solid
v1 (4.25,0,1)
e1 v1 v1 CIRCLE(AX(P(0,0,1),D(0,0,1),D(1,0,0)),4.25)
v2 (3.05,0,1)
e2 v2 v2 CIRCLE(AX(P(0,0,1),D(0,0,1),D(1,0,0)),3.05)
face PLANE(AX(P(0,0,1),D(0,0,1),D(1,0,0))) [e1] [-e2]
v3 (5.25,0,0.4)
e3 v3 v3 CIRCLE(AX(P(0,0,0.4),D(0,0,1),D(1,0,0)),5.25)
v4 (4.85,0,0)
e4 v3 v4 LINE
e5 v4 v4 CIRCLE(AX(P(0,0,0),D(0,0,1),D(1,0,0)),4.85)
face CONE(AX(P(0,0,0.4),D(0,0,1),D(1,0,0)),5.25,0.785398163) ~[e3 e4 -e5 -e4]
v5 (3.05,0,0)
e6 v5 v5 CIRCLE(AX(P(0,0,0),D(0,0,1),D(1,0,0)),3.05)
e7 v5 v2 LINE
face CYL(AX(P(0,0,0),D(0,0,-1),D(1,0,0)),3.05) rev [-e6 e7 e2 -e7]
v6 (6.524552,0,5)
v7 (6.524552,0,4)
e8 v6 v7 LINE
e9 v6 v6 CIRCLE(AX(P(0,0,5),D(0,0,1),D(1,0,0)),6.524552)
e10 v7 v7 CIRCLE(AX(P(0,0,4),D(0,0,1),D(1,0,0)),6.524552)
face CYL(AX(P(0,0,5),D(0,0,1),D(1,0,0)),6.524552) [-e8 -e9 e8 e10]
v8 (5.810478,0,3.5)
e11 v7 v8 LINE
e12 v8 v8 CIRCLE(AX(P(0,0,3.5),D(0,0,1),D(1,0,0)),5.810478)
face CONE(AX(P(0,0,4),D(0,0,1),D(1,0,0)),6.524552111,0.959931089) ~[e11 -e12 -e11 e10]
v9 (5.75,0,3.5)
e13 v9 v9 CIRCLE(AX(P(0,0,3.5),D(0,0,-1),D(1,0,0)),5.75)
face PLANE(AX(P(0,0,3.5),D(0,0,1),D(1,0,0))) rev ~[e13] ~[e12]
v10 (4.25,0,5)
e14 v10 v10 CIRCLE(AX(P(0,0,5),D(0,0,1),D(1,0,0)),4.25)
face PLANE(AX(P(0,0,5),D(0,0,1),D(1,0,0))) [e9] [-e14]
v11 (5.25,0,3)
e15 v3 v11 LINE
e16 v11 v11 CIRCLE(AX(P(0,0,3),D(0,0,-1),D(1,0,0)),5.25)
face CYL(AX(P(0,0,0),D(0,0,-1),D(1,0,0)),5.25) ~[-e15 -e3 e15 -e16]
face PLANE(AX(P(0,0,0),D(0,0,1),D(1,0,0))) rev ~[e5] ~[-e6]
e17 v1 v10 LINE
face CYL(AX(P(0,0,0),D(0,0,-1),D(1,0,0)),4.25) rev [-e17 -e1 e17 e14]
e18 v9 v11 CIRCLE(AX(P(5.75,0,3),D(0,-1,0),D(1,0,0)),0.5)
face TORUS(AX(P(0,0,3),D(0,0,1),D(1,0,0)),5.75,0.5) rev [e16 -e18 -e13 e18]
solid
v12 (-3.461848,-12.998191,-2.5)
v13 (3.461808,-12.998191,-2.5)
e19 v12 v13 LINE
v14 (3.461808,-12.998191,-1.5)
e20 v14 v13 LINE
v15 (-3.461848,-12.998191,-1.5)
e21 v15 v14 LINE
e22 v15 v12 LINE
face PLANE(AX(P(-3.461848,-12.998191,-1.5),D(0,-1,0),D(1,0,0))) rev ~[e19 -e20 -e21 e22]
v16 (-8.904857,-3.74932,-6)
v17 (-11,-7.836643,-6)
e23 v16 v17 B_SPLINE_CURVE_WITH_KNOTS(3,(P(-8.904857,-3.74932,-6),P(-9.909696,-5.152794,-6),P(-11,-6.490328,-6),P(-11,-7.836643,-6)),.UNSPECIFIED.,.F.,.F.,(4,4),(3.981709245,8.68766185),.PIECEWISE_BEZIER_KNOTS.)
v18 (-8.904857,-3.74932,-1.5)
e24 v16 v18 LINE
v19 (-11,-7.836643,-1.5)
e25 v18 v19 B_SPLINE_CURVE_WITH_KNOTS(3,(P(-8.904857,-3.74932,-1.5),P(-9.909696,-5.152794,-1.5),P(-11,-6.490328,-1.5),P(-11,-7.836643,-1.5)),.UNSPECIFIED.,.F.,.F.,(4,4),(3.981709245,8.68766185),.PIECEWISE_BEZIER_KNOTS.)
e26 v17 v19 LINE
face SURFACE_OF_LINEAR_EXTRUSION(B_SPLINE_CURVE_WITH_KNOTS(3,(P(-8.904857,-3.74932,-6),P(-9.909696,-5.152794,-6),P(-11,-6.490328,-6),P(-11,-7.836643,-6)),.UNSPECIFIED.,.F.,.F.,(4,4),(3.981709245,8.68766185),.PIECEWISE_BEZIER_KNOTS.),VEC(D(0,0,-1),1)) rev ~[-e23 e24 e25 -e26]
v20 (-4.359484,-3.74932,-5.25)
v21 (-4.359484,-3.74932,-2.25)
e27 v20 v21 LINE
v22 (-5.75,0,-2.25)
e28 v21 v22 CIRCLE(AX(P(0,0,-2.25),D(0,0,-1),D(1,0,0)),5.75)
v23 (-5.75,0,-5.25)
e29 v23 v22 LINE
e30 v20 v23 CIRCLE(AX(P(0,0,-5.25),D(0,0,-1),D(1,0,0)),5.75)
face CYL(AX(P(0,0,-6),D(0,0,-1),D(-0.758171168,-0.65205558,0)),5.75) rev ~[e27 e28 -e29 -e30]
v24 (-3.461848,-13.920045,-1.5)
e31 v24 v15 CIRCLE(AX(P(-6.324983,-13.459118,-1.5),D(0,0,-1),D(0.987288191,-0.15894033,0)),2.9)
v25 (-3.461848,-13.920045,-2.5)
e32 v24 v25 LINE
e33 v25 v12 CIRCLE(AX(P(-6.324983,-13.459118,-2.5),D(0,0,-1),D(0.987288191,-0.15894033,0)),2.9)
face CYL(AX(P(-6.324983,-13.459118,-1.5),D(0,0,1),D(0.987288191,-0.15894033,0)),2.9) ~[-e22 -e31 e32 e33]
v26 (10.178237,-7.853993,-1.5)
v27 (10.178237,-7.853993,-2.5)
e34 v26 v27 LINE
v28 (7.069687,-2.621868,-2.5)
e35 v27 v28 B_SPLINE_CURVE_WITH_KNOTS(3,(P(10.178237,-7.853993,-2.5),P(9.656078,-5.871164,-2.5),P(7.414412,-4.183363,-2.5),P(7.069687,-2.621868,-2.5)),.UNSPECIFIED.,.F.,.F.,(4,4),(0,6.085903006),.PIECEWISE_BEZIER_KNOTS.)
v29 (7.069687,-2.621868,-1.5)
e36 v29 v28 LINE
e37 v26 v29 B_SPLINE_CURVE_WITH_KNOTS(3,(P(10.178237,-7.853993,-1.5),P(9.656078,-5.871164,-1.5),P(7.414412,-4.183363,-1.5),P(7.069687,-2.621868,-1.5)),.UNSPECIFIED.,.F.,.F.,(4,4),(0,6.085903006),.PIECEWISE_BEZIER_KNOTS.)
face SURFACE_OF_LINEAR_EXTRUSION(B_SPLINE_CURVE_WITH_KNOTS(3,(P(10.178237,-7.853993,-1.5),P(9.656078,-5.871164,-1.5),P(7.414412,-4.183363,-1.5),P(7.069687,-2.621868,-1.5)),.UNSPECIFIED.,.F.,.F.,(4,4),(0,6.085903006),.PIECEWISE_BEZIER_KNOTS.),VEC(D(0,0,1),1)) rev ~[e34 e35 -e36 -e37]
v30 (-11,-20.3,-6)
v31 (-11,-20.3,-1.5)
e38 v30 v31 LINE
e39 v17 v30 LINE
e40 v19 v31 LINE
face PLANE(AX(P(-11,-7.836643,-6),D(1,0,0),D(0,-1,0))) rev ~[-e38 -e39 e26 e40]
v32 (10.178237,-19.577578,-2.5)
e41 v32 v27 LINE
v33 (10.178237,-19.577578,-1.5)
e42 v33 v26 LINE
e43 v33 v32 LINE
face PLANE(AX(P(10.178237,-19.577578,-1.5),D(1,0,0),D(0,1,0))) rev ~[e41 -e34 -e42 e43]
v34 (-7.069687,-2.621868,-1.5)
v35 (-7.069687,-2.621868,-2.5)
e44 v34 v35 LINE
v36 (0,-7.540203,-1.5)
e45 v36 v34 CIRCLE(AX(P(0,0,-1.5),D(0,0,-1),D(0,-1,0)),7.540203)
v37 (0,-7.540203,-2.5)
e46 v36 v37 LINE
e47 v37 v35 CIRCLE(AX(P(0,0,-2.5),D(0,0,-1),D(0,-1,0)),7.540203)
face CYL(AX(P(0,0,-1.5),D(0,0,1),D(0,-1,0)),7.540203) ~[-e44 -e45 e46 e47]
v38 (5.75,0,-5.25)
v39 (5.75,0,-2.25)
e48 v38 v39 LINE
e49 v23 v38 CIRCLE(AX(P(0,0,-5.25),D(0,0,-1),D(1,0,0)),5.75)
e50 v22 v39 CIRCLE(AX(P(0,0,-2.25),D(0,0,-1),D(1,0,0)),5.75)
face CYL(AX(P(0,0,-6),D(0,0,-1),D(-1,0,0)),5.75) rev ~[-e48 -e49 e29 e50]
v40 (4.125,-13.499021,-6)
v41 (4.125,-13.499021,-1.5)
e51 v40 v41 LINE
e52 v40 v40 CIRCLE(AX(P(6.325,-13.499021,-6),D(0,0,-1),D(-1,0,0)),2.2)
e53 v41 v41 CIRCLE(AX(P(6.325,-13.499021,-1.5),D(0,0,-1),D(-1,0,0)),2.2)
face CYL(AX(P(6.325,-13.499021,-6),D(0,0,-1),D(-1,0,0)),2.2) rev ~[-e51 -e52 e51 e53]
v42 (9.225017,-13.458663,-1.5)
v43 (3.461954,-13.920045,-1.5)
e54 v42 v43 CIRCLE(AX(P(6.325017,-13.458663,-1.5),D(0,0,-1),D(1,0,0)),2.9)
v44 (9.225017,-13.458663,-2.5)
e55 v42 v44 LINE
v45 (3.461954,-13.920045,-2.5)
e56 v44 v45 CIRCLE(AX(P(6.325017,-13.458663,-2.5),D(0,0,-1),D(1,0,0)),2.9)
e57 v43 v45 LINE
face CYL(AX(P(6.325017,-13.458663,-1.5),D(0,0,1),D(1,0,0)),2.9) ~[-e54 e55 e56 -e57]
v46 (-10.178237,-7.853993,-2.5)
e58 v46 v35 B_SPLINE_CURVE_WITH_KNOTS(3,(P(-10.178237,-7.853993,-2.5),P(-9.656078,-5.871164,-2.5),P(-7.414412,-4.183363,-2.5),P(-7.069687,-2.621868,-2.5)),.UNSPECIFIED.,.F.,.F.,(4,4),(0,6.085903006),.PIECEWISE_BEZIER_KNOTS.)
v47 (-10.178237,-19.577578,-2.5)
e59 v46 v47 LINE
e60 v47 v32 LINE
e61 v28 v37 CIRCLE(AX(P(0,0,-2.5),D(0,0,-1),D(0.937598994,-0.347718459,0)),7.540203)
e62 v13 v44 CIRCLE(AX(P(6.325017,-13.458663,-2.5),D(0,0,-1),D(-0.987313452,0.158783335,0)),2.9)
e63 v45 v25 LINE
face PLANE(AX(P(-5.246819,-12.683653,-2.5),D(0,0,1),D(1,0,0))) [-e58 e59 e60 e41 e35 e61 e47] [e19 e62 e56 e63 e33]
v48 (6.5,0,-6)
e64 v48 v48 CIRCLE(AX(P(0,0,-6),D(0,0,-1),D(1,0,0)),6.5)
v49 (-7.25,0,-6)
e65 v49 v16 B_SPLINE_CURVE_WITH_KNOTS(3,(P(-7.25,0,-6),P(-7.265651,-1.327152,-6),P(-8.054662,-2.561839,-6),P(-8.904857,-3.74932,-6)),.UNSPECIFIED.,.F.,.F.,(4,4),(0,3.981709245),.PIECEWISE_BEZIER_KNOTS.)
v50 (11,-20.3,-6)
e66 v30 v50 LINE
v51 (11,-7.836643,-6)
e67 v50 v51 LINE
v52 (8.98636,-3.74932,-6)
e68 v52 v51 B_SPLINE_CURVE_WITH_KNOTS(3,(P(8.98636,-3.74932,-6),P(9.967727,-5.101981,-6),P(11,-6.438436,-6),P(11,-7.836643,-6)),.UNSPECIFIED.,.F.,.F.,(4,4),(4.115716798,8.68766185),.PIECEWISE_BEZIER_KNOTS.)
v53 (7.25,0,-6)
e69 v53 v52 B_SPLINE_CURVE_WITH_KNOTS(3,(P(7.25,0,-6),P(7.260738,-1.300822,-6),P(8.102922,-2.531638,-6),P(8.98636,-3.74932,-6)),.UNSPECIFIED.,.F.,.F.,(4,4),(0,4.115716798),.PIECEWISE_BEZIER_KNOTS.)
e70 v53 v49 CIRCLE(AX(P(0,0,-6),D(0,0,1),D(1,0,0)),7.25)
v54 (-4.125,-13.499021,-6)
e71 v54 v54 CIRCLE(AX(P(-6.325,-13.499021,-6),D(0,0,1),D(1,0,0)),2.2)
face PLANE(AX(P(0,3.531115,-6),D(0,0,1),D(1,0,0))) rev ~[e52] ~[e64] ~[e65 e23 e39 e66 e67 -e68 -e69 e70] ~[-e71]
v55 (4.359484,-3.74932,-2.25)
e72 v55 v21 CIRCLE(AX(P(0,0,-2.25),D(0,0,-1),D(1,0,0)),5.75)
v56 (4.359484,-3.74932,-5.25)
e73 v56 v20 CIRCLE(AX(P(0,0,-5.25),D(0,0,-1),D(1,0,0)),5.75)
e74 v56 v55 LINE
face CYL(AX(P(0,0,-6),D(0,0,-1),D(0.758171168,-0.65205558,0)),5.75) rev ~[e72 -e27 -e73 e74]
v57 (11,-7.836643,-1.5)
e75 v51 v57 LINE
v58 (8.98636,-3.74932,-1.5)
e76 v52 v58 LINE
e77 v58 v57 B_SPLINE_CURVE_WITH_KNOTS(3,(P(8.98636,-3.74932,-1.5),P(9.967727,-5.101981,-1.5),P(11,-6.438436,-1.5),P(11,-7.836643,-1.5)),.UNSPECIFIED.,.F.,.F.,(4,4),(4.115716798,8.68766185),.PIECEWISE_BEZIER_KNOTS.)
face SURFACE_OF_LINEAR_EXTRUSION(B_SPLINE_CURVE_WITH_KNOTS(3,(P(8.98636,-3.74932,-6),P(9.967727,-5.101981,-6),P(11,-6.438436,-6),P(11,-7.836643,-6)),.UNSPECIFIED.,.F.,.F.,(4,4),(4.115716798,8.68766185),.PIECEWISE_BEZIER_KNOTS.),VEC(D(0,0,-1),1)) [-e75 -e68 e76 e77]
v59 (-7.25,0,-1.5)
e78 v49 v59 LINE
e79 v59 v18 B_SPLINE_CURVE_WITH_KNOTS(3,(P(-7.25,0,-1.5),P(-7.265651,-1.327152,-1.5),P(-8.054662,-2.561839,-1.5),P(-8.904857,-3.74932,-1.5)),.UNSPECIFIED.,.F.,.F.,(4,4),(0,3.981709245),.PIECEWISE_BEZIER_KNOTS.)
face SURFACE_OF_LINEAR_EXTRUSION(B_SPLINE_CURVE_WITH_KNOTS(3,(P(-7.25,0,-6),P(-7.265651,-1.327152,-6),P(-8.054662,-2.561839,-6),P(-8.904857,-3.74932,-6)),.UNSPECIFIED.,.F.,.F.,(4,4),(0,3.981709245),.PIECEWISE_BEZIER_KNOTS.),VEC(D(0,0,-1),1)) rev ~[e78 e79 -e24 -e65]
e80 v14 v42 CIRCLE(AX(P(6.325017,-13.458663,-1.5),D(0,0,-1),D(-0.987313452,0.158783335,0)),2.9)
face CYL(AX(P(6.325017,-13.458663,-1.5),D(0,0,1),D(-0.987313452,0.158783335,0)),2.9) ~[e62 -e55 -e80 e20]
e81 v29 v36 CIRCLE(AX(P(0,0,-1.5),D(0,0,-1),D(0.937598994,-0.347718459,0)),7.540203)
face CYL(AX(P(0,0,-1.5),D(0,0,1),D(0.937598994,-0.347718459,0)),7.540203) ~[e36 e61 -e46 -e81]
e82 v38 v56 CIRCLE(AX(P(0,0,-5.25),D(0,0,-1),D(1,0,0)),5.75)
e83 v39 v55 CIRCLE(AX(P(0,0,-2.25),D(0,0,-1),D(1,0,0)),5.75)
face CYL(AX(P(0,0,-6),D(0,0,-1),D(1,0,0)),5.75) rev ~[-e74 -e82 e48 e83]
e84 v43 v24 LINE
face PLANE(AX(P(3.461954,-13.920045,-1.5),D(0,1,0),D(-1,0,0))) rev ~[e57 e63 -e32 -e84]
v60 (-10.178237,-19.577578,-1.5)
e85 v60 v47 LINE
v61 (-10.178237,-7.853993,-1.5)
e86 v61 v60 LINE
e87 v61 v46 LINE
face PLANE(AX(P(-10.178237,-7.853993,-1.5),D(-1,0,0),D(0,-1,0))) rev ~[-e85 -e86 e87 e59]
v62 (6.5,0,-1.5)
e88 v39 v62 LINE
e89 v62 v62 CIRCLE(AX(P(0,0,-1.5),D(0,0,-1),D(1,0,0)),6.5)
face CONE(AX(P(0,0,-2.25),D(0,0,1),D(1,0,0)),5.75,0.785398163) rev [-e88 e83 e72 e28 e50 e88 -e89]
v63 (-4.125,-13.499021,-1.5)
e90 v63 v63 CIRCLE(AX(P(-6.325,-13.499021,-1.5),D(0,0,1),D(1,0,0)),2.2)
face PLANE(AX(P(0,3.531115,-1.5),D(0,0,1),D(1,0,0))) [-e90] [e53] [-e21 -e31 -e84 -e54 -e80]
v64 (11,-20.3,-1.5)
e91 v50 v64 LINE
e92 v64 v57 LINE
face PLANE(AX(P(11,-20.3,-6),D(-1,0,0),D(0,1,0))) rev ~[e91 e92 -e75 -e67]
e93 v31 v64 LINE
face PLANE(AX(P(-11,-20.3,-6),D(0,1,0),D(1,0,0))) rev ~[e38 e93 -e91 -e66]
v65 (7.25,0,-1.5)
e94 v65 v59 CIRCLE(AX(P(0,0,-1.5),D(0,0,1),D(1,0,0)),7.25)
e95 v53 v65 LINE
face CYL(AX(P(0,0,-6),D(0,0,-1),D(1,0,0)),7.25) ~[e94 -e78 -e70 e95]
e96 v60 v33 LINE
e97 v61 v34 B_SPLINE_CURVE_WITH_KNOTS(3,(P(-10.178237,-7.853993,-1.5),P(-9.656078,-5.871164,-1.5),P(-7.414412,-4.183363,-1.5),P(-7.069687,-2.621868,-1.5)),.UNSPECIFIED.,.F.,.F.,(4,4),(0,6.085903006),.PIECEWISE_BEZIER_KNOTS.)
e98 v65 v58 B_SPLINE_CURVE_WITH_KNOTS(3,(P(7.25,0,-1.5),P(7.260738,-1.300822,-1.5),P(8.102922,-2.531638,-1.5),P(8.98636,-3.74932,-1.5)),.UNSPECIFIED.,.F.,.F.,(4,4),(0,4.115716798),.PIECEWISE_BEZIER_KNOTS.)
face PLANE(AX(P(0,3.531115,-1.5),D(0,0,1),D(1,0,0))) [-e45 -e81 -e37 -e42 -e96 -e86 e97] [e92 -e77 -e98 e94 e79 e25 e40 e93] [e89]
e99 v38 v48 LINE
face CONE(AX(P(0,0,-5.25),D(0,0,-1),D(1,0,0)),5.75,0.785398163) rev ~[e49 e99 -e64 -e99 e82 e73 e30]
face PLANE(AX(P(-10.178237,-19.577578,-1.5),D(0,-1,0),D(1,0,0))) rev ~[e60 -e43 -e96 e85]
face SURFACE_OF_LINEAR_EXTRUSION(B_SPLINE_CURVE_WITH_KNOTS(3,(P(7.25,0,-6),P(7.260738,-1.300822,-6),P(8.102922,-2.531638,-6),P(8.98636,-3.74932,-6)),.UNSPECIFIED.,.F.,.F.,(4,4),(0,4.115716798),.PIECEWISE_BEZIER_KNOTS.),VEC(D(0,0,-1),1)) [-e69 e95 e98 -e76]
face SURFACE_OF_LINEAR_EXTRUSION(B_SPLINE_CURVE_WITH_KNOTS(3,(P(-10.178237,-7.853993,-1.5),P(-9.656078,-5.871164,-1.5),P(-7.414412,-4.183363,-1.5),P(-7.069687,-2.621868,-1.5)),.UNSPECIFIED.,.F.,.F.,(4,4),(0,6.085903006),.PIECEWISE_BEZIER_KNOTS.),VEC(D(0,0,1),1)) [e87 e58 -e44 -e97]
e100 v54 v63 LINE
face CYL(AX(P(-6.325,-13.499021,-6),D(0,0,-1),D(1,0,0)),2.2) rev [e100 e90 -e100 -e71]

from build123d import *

# Parameters (mm, degrees)
F0_R      = 4.25
F0_R_2    = 3.05
F1_DEPTH  = 1
F0_R_3    = 5.25
F2_DEPTH  = 5
F3_SIZE   = 0.4
F5_R      = 6.5245521105
F5_R_2    = 4.8436348364
F6_DEPTH  = 1.5
F7_R      = 0.5
F8_SIZE2  = 0.7140740034
F8_SIZE   = 0.5
F10_R     = 2.2
F11_DEPTH = 4.5
F15_DEPTH = 1


# Not quite as in the source:
# - a fillet or chamfer that OpenCascade refuses, or shapes differently, is made with other operations: its cross-section is extruded or revolved along the edge and cut away or added


with BuildPart() as f1:
    # F0 (on Top) → F1 (new body)
    with BuildSketch(Plane.XY):
        Circle(F0_R)
        Circle(F0_R_2, mode=Mode.SUBTRACT)
    extrude(amount=F1_DEPTH)

    # F0 (on Top) → F2 (join)
    with BuildSketch(Plane.XY):
        Circle(F0_R_3)
        Circle(F0_R, mode=Mode.SUBTRACT)
    extrude(amount=F2_DEPTH)

    # F3
    f3_edges = [f1.edges().sort_by_distance(p)[0] for p in [
        (-5.25, 0, 0),
    ]]
    chamfer(f3_edges, length=F3_SIZE)

    # F5 (on offset) → F6 (join)
    with BuildSketch(Plane.XY.offset(5)):
        Circle(F5_R)
        Circle(F5_R_2, mode=Mode.SUBTRACT)
    extrude(amount=-F6_DEPTH)

    # F7
    f7_edges = [f1.edges().sort_by_distance(p)[0] for p in [
        (-5.25, 0, 3.5),
    ]]
    fillet(f7_edges, radius=F7_R)

    # F8
    f8_edges = [f1.edges().sort_by_distance(p)[0] for p in [
        (-6.524552, 0, 3.5),
    ]]
    f8_side = f1.faces().sort_by_distance((-6.524552, 0, 4.25))[0]
    chamfer(f8_edges, length=F8_SIZE, length2=F8_SIZE2, reference=f8_side)


with BuildPart() as f11:
    # F10 (on offset) → F11 (new body)
    with BuildSketch(Plane.XY.offset(-6)):
        with BuildLine():
            ThreePointArc((-5.75, 0), (0, 5.75), (5.75, 0))
            Line((5.75, 0), (7.25, 0))
            ThreePointArc((7.25, 0), (0, 7.25), (-7.25, 0))
            Line((-7.25, 0), (-5.75, 0))
        make_face()
        with BuildLine():
            ThreePointArc((-4.3594842183, -3.749319585), (-5.3911749302, -1.9994331378), (-5.75, 0))
            Line((-5.75, 0), (-7.25, 0))
            ThreePointArc((-7.25, 0), (-6.9839296942, -1.9460796559), (-6.2052479926, -3.749319585))
            Line((-6.2052479926, -3.749319585), (-4.3594842183, -3.749319585))
        make_face()
        with BuildLine():
            Line((6.2052479926, -3.749319585), (4.3594842183, -3.749319585))
            ThreePointArc((4.3594842183, -3.749319585), (0, -5.75), (-4.3594842183, -3.749319585))
            Line((-4.3594842183, -3.749319585), (-6.2052479926, -3.749319585))
            ThreePointArc((-6.2052479926, -3.749319585), (0, -7.25), (6.2052479926, -3.749319585))
        make_face()
        with BuildLine():
            Line((7.25, 0), (5.75, 0))
            ThreePointArc((5.75, 0), (5.3911749302, -1.9994331378), (4.3594842183, -3.749319585))
            Line((4.3594842183, -3.749319585), (6.2052479926, -3.749319585))
            ThreePointArc((6.2052479926, -3.749319585), (6.9839296942, -1.9460796559), (7.25, 0))
        make_face()
        with BuildLine():
            ThreePointArc((-6.2052479926, -3.749319585), (-6.9839296942, -1.9460796559), (-7.25, 0))
            add(Edge.make_bspline(
                [(-7.25, 0), (-7.2656506928, -1.3271520952), (-8.0546621033, -2.5618388367), (-8.9048569039, -3.749319585)],
                knots=[0, 0, 0, 0, 3.981709245, 3.981709245, 3.981709245, 3.981709245], degree=3))
            Line((-8.9048569039, -3.749319585), (-6.2052479926, -3.749319585))
        make_face()
        with BuildLine():
            Line((8.9863599272, -3.749319585), (6.2052479926, -3.749319585))
            ThreePointArc((6.2052479926, -3.749319585), (0, -7.25), (-6.2052479926, -3.749319585))
            Line((-6.2052479926, -3.749319585), (-8.9048569039, -3.749319585))
            add(Edge.make_bspline(
                [(-8.9048569039, -3.749319585), (-9.9096958288, -5.1527942681), (-11, -6.4903283123), (-11, -7.8366426751)],
                knots=[3.981709245, 3.981709245, 3.981709245, 3.981709245, 8.6876618498, 8.6876618498, 8.6876618498, 8.6876618498], degree=3))
            Line((-11, -7.8366426751), (11, -7.8366426751))
            add(Edge.make_bspline(
                [(8.9863599272, -3.749319585), (9.9677269971, -5.1019814592), (11, -6.4384359832), (11, -7.8366426751)],
                knots=[4.1157167981, 4.1157167981, 4.1157167981, 4.1157167981, 8.6876618498, 8.6876618498, 8.6876618498, 8.6876618498], degree=3))
        make_face()
        with BuildLine():
            add(Edge.make_bspline(
                [(7.25, 0), (7.2607375636, -1.3008223386), (8.1029221586, -2.5316380218), (8.9863599272, -3.749319585)],
                knots=[0, 0, 0, 0, 4.1157167981, 4.1157167981, 4.1157167981, 4.1157167981], degree=3))
            ThreePointArc((7.25, 0), (6.9839296942, -1.9460796559), (6.2052479926, -3.749319585))
            Line((6.2052479926, -3.749319585), (8.9863599272, -3.749319585))
        make_face()
        Polygon((11, -20.3), (11, -7.8366426751), (-11, -7.8366426751), (-11, -20.3), (0, -20.3), align=None)
        with Locations((-6.325, -13.4990205988)):
            Circle(F10_R, mode=Mode.SUBTRACT)
        with BuildLine():
            ThreePointArc((8.525, -13.4990205988), (6.325, -15.6990205988), (4.125, -13.4990205988))
            ThreePointArc((4.125, -13.4990205988), (6.325, -11.2990205988), (8.525, -13.4990205988))
        make_face(mode=Mode.SUBTRACT)
    extrude(amount=F11_DEPTH)

    # F12: chamfer of 0.75 on 2 edges, made by hand

    # F12_s1 → F12_t2 (revolve, cut)
    with BuildSketch(Plane.XZ):
        Polygon((5.75, -2.25), (6.5, -1.5), (5.75, -1.5), align=None)
    revolve(axis=Axis((0, 0, -1.5), (0, 0, -1)), mode=Mode.SUBTRACT)

    # F12_s3 → F12_t4 (revolve, cut)
    with BuildSketch(Plane.XZ):
        Polygon((5.75, -5.25), (6.5, -6), (5.75, -6), align=None)
    revolve(axis=Axis((0, 0, -6), (0, 0, -1)), mode=Mode.SUBTRACT)

    # F14 (on offset) → F15 (cut)
    with BuildSketch(Plane.XY.offset(-1.5)):
        with BuildLine():
            ThreePointArc((0, -7.5402029312), (-4.3061145714, -6.1896718444), (-7.0696866821, -2.6218677427))
            add(Edge.make_bspline(
                [(-10.1782370821, -7.8539925324), (-9.6560776489, -5.8711635466), (-7.4144124978, -4.1833631916), (-7.0696866821, -2.6218677427)],
                knots=[0, 0, 0, 0, 6.0859030065, 6.0859030065, 6.0859030065, 6.0859030065], degree=3))
            Line((-10.1782370821, -7.8539925324), (-10.1782370821, -19.5775783759))
            Line((-10.1782370821, -19.5775783759), (0, -19.5775783759))
            Line((0, -19.5775783759), (0, -13.9200452533))
            Line((0, -13.9200452533), (-3.4618476619, -13.9200452533))
            ThreePointArc((-3.4618476619, -13.9200452533), (-9.2249834149, -13.4591182958), (-3.4618476619, -12.9981913384))
            Line((-3.4618476619, -12.9981913384), (0, -12.9981913384))
            Line((0, -12.9981913384), (0, -7.5402029312))
        make_face()
        with BuildLine():
            add(Edge.make_bspline(
                [(10.1782370821, -7.8539925324), (9.6560776489, -5.8711635466), (7.4144124978, -4.1833631916), (7.0696866821, -2.6218677427)],
                knots=[0, 0, 0, 0, 6.0859030065, 6.0859030065, 6.0859030065, 6.0859030065], degree=3))
            ThreePointArc((7.0696866821, -2.6218677427), (4.3061145714, -6.1896718444), (0, -7.5402029312))
            Line((0, -7.5402029312), (0, -12.9981913384))
            Line((0, -12.9981913384), (3.461807566, -12.9981913384))
            ThreePointArc((3.461807566, -12.9981913384), (6.5559861293, -10.5678753889), (9.225016577, -13.4586630092))
            ThreePointArc((9.225016577, -13.4586630092), (6.5564458102, -16.3494138649), (3.4619541562, -13.9200452533))
            Line((3.4619541562, -13.9200452533), (0, -13.9200452533))
            Line((0, -13.9200452533), (0, -19.5775783759))
            Line((0, -19.5775783759), (10.1782370821, -19.5775783759))
            Line((10.1782370821, -19.5775783759), (10.1782370821, -7.8539925324))
        make_face()
    extrude(amount=-F15_DEPTH, mode=Mode.SUBTRACT)


solid = Compound([f1.part, f11.part])
